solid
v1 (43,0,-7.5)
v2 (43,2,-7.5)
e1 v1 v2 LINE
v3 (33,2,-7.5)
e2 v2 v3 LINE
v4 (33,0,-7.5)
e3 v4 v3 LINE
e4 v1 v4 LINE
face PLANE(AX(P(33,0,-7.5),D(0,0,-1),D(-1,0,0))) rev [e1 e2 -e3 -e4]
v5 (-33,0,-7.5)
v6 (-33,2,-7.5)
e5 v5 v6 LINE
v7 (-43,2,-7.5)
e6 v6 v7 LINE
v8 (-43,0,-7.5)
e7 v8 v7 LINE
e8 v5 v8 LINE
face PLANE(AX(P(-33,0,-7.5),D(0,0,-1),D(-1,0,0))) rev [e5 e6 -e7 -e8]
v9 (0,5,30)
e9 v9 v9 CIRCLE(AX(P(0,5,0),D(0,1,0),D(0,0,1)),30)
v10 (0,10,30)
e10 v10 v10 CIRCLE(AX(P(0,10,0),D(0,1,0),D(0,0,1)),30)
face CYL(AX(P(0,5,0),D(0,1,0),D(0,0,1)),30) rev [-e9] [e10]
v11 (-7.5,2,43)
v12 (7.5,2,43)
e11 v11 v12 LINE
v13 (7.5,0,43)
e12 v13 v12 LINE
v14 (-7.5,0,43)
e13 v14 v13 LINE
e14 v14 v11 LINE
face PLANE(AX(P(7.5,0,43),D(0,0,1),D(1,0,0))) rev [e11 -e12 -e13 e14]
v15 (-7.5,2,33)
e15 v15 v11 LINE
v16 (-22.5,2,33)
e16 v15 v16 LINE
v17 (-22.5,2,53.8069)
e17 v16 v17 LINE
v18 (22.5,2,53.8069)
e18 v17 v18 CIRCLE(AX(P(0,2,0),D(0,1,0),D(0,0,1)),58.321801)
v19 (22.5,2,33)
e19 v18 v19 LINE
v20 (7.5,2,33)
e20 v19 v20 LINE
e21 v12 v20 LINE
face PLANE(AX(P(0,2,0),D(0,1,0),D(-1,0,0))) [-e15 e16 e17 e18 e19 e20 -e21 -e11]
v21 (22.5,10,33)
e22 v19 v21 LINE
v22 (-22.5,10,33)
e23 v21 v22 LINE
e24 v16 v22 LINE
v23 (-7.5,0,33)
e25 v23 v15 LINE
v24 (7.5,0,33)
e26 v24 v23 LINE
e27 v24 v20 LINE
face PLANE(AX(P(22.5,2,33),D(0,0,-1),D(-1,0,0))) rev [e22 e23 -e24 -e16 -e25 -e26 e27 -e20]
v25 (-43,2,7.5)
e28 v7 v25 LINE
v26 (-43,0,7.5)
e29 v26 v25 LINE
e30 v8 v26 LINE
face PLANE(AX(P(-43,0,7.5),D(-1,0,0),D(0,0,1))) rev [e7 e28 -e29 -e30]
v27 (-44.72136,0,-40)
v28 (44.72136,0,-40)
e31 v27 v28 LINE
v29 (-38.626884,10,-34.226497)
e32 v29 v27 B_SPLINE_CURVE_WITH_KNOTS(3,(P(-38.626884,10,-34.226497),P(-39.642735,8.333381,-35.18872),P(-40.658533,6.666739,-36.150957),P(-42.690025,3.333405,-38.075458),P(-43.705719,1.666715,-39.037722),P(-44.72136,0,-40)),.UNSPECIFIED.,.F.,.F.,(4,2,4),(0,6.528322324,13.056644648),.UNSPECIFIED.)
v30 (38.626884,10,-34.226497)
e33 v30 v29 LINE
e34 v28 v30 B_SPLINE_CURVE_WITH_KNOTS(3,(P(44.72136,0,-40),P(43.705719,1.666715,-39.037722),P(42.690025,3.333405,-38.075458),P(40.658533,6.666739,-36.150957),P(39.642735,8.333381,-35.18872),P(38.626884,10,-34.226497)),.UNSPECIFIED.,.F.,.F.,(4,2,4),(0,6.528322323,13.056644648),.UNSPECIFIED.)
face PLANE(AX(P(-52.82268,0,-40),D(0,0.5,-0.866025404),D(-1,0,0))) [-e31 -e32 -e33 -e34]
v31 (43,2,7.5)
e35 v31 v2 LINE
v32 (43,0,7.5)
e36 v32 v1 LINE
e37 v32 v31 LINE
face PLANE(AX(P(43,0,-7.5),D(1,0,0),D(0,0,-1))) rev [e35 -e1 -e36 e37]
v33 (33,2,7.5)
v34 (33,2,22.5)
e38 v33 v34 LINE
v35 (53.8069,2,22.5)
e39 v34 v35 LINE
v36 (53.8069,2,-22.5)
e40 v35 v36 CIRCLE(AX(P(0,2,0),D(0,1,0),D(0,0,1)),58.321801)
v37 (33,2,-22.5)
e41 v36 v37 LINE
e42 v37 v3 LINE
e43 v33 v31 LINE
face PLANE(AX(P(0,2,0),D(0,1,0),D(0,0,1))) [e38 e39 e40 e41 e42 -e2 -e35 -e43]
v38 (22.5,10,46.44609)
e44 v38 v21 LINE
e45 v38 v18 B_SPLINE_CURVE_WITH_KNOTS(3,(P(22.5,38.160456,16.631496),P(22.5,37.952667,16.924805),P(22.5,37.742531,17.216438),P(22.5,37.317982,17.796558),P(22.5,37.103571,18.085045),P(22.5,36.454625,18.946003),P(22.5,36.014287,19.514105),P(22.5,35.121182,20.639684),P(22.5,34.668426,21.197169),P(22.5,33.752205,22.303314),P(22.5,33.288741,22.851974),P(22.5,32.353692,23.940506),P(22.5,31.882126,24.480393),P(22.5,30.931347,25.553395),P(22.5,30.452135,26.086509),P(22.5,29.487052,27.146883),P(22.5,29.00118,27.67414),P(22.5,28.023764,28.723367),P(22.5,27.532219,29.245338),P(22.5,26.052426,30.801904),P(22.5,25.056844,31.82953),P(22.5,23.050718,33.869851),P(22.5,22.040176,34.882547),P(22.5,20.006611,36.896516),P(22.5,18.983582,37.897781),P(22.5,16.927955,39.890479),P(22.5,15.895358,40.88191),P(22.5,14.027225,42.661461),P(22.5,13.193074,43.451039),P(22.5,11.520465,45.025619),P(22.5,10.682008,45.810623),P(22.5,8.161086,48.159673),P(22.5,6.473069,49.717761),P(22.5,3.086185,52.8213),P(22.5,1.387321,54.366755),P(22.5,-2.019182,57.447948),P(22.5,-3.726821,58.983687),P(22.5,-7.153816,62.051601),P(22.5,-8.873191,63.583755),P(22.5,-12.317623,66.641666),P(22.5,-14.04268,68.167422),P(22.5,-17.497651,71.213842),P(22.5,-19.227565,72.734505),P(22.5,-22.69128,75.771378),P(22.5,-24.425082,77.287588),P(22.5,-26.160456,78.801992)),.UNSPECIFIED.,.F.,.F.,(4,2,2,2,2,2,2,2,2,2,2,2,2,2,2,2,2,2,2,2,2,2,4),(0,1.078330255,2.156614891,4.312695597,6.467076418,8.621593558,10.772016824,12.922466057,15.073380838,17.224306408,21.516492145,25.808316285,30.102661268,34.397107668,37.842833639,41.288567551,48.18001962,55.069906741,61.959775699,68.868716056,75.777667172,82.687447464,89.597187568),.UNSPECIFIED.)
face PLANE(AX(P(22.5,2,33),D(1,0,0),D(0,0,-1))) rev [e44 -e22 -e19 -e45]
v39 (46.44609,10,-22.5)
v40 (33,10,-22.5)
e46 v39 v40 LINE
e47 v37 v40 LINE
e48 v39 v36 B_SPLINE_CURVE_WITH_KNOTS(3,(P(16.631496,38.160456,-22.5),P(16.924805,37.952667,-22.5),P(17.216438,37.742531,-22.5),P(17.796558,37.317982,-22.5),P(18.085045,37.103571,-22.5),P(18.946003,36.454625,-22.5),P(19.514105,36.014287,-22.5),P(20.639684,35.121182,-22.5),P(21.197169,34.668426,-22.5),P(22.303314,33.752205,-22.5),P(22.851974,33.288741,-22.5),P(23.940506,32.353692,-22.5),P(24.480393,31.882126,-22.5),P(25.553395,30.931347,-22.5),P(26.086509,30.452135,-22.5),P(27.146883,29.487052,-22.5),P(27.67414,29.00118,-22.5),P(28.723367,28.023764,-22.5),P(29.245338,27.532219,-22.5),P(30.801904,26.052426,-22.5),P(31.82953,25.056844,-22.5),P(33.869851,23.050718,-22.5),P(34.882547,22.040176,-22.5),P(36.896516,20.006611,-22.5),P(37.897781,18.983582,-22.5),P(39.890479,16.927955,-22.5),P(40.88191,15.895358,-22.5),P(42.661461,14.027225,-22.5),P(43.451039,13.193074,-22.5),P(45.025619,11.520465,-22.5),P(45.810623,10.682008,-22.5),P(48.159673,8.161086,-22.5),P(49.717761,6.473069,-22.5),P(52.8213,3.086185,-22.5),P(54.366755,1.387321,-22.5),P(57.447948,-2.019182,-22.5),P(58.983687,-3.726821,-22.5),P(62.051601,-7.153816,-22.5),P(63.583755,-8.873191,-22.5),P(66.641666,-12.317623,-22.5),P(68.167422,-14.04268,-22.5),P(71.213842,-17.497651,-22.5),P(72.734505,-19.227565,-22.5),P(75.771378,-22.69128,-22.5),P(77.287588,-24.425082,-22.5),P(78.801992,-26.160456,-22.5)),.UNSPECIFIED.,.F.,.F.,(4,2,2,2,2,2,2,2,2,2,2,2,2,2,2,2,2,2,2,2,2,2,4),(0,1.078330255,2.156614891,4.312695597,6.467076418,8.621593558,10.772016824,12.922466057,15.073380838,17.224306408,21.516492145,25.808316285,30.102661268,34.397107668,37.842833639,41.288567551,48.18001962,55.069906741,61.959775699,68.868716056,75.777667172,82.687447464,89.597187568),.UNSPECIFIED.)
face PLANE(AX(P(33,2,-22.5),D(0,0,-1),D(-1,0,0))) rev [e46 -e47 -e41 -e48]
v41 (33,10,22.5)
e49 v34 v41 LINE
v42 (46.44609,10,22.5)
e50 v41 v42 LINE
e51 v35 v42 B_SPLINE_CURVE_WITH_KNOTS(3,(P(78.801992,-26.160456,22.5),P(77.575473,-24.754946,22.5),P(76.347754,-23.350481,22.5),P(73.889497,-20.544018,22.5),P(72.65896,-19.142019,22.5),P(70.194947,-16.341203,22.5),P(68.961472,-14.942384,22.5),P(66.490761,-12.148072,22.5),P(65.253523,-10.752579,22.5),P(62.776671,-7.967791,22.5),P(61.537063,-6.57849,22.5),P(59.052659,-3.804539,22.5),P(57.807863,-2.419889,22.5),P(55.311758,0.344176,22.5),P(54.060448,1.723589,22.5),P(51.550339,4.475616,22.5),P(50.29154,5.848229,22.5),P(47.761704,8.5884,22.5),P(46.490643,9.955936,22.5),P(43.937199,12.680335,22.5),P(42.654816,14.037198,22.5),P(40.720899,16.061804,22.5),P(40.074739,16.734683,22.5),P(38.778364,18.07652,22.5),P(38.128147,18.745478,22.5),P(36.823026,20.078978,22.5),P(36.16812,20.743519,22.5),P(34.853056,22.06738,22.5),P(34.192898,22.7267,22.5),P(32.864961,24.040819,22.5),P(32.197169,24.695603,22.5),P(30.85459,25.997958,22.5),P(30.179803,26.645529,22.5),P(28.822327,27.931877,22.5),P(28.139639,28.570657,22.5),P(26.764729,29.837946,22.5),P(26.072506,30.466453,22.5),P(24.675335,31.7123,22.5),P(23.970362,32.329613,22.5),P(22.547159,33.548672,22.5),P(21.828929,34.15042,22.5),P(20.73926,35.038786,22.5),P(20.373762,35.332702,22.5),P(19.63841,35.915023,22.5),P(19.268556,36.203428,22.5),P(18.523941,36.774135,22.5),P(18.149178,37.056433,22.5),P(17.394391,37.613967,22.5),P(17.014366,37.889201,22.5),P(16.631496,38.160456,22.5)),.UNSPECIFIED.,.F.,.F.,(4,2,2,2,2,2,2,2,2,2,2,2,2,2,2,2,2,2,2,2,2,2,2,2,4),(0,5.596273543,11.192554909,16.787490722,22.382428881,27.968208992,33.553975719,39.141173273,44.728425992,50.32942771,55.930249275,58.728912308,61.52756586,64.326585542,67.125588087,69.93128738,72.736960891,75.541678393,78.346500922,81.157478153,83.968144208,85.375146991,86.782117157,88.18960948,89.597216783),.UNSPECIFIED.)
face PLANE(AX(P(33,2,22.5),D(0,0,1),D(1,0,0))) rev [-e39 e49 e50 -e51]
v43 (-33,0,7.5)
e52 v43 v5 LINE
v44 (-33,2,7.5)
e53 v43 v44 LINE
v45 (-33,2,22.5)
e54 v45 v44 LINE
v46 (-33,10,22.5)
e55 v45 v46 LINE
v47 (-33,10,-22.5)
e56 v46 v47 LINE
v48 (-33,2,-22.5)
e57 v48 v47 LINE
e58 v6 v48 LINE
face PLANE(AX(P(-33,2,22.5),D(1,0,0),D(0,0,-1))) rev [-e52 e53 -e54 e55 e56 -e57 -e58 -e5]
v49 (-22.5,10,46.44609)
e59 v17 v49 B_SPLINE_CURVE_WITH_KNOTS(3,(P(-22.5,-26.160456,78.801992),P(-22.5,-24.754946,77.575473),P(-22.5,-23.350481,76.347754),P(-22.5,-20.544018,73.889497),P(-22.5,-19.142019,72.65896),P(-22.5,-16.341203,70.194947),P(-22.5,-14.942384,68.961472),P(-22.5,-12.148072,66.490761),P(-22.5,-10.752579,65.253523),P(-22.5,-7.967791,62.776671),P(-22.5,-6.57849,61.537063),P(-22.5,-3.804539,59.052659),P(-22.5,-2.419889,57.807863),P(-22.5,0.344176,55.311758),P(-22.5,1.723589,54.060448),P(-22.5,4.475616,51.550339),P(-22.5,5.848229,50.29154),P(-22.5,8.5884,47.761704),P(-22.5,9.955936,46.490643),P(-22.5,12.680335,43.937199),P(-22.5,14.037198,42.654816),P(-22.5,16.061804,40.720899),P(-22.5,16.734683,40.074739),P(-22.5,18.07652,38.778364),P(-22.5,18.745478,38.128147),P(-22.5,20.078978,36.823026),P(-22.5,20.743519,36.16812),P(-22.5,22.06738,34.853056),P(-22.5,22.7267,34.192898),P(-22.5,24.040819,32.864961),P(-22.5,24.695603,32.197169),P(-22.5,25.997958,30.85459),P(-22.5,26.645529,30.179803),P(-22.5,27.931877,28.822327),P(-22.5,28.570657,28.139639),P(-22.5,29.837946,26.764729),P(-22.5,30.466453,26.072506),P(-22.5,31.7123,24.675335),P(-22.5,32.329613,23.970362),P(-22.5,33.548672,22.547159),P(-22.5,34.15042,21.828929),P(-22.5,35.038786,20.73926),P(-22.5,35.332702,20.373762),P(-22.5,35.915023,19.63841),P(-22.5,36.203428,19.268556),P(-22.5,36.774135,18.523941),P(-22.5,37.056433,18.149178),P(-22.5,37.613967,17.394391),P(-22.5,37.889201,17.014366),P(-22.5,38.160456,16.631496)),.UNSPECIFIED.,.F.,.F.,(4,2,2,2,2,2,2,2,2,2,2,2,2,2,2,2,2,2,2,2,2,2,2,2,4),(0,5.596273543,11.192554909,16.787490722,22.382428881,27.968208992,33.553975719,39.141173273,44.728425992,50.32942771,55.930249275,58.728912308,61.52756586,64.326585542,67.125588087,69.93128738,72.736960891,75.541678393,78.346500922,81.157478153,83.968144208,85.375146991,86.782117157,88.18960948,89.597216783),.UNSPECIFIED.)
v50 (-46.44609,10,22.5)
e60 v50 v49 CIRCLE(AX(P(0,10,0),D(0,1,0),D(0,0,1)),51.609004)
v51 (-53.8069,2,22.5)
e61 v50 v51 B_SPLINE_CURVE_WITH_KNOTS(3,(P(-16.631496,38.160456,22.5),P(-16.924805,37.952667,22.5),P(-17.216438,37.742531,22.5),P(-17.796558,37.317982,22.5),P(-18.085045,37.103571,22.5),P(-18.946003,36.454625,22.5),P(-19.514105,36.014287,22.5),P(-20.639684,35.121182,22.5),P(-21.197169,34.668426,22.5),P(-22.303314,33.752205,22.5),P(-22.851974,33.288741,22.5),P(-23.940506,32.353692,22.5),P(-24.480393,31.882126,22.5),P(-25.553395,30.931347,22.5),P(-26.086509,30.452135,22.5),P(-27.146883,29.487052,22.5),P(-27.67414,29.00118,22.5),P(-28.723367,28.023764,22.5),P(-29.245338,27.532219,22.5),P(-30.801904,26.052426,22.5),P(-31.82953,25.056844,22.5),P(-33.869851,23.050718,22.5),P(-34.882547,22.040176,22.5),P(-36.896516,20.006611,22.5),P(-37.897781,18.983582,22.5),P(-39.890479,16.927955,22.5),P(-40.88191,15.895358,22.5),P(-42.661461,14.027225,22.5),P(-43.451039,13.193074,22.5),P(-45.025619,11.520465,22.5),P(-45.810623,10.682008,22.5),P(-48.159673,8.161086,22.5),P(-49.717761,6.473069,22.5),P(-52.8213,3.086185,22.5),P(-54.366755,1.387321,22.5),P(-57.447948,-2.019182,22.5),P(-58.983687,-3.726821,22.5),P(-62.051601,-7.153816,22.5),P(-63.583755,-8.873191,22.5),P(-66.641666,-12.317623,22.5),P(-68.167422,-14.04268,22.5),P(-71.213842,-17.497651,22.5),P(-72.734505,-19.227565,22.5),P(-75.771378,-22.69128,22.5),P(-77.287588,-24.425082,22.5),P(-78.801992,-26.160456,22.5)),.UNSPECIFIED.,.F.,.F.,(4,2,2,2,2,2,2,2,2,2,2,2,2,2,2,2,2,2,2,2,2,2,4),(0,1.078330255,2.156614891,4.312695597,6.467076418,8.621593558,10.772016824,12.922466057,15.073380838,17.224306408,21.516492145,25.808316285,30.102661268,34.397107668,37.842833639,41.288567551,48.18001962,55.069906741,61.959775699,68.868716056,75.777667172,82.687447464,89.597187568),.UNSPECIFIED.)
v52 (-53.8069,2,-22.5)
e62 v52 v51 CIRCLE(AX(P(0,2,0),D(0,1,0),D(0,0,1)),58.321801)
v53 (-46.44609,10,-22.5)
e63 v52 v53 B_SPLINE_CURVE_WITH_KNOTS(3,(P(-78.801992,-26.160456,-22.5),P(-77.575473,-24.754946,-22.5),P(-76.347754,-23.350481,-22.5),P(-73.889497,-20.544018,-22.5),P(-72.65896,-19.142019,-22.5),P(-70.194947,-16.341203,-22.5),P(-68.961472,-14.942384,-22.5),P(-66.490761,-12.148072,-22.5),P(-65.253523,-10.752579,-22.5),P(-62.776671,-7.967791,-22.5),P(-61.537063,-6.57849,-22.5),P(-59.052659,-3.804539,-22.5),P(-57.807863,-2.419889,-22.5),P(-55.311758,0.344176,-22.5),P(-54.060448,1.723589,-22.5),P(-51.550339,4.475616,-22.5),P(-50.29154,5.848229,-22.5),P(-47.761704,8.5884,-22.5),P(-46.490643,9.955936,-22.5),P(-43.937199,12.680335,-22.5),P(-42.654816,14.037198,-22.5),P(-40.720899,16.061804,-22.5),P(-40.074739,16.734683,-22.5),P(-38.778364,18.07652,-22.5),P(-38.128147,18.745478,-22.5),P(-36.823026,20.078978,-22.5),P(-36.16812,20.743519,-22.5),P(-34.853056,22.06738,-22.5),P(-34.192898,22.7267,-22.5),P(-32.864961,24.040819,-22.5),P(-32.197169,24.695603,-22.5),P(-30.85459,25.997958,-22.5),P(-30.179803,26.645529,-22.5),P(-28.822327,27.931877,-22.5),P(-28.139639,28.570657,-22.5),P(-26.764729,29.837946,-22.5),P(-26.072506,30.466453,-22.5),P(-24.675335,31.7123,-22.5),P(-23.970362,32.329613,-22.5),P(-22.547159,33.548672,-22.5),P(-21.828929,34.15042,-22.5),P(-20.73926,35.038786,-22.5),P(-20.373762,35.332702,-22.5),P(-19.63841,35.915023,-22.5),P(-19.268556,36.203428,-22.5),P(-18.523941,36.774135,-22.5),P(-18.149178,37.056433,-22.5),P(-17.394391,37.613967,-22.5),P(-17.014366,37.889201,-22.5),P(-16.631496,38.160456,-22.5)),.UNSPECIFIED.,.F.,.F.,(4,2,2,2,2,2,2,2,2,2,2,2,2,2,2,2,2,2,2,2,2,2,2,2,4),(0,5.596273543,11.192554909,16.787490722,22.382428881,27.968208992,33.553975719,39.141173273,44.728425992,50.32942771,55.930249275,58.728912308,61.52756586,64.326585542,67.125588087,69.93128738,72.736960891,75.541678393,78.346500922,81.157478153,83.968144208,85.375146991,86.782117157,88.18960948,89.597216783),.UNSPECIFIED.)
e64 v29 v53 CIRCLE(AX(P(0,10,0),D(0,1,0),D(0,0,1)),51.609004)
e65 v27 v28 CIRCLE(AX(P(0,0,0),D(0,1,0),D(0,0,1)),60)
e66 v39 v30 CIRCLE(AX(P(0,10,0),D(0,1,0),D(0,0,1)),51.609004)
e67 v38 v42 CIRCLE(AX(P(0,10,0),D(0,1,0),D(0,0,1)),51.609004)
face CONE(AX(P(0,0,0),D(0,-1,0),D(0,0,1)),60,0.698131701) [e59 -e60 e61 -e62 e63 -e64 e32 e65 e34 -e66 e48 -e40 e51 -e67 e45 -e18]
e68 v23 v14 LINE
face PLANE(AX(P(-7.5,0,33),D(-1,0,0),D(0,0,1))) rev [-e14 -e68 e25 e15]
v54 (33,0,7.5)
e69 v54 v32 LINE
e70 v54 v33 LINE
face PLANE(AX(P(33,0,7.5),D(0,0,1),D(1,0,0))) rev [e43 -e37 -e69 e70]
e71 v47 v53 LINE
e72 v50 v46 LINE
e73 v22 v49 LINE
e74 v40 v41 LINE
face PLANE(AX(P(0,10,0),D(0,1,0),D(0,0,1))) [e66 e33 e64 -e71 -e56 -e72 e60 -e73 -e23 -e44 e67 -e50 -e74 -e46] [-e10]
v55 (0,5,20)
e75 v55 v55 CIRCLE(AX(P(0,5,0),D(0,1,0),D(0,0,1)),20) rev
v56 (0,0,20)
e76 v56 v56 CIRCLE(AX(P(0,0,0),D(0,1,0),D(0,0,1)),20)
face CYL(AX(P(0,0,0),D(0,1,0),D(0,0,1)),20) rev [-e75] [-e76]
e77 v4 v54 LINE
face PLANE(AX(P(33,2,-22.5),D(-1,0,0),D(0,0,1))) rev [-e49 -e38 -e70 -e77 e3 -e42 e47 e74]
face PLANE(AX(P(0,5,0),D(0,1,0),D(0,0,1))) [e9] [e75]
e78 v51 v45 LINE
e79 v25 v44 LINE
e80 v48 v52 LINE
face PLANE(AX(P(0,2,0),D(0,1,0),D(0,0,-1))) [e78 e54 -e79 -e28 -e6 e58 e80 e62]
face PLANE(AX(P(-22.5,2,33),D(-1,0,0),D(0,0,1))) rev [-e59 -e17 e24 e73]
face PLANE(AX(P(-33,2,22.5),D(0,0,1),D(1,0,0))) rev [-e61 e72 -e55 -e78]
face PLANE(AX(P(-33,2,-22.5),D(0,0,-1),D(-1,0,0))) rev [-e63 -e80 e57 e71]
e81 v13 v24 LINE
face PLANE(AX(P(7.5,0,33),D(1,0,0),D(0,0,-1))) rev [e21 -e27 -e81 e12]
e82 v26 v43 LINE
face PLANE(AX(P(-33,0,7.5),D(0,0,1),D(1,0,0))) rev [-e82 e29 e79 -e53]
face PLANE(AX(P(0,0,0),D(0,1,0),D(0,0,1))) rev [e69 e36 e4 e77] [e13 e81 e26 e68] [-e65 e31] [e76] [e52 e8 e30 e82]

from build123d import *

# Parameters (mm, degrees)
SKETCH1_R           = 60
BOSS_EXTRUDE1_DEPTH = 10
BOSS_EXTRUDE1_TAPER = 40
SKETCH2_W           = 102.123847816
SKETCH2_H           = 48.488569787
CUT_EXTRUDE1_DEPTH  = 86.440037605
CHAMFER1_SIZE2      = 5.773502692
CHAMFER1_SIZE       = 10
SKETCH3_R           = 20
CUT_EXTRUDE2_DEPTH  = 86.440037453
SKETCH4_W           = 35.035611717
SKETCH4_H           = 45
CUT_EXTRUDE3_DEPTH  = 8
SKETCH6_W           = 10
SKETCH6_H           = 15
CUT_EXTRUDE5_DEPTH  = 86.229103011
CIRPATTERN1_COUNT   = 3
CIRPATTERN1_ANGLE   = 180
SKETCH7_R           = 30
CUT_EXTRUDE6_DEPTH  = 5


with BuildPart() as part:
    # Sketch1 → Boss-Extrude1 (new body)
    with BuildSketch(Plane(origin=(0, 0, 0), x_dir=(1, 0, 0), z_dir=(0, 1, 0))):
        Circle(SKETCH1_R)
    extrude(amount=BOSS_EXTRUDE1_DEPTH, taper=BOSS_EXTRUDE1_TAPER)

    # Sketch2 → Cut-Extrude1 (cut, through all)
    with BuildSketch(Plane(origin=(0, 10, 0), x_dir=(1, 0, 0), z_dir=(0, 1, 0))):
        with Locations((-1.760755997, 64.244284894)):
            Rectangle(SKETCH2_W, SKETCH2_H)
    extrude(amount=-CUT_EXTRUDE1_DEPTH, mode=Mode.SUBTRACT)

    # Chamfer1
    chamfer1_edges = [part.edges().sort_by_distance(p)[0] for p in [
        (0, 10, -40),
    ]]
    chamfer1_side = [part.faces().sort_by_distance(p)[0] for p in [
        (0, 9.884529946, -40),
    ]]
    chamfer(chamfer1_edges, length=CHAMFER1_SIZE - 0.0001, length2=CHAMFER1_SIZE2 - 0.0001, reference=chamfer1_side[0])  # a hair under: the kernel refuses the full size

    # Sketch3 → Cut-Extrude2 (cut, through all)
    with BuildSketch(Plane(origin=(0, 10, 0), x_dir=(1, 0, 0), z_dir=(0, 1, 0))):
        with Locations(Location((0, 0, 0), (0, 0, 270))):
            Circle(SKETCH3_R)
    extrude(amount=-CUT_EXTRUDE2_DEPTH, mode=Mode.SUBTRACT)

    # Sketch4 → Cut-Extrude3 (cut)
    with BuildSketch(Plane(origin=(0, 10, 0), x_dir=(1, 0, 0), z_dir=(0, 1, 0))):
        with Locations((50.517805859, 0)):
            Rectangle(SKETCH4_W, SKETCH4_H)
    cut_extrude3 = extrude(amount=-CUT_EXTRUDE3_DEPTH, mode=Mode.SUBTRACT)

    # Sketch6 → Cut-Extrude5 (cut, through all)
    with BuildSketch(Plane(origin=(0, 2, 0), x_dir=(1, 0, 0), z_dir=(0, 1, 0))):
        with Locations((38, 0)):
            Rectangle(SKETCH6_W, SKETCH6_H)
    cut_extrude5 = extrude(amount=-CUT_EXTRUDE5_DEPTH, mode=Mode.SUBTRACT)

    # CirPattern1: Cut-Extrude3, Cut-Extrude5 ×3 about axis
    cirpattern1_axis = Axis((0, 0, 0), (0, -1, 0))
    add([cut_extrude3.rotate(cirpattern1_axis, i * CIRPATTERN1_ANGLE / (CIRPATTERN1_COUNT - 1)) for i in range(1, CIRPATTERN1_COUNT)], mode=Mode.SUBTRACT)
    add([cut_extrude5.rotate(cirpattern1_axis, i * CIRPATTERN1_ANGLE / (CIRPATTERN1_COUNT - 1)) for i in range(1, CIRPATTERN1_COUNT)], mode=Mode.SUBTRACT)

    # Sketch7 → Cut-Extrude6 (cut)
    with BuildSketch(Plane(origin=(0, 10, 0), x_dir=(1, 0, 0), z_dir=(0, 1, 0))):
        with Locations(Location((0, 0, 0), (0, 0, 270))):
            Circle(SKETCH7_R)
    extrude(amount=-CUT_EXTRUDE6_DEPTH, mode=Mode.SUBTRACT)


solid = part.part
